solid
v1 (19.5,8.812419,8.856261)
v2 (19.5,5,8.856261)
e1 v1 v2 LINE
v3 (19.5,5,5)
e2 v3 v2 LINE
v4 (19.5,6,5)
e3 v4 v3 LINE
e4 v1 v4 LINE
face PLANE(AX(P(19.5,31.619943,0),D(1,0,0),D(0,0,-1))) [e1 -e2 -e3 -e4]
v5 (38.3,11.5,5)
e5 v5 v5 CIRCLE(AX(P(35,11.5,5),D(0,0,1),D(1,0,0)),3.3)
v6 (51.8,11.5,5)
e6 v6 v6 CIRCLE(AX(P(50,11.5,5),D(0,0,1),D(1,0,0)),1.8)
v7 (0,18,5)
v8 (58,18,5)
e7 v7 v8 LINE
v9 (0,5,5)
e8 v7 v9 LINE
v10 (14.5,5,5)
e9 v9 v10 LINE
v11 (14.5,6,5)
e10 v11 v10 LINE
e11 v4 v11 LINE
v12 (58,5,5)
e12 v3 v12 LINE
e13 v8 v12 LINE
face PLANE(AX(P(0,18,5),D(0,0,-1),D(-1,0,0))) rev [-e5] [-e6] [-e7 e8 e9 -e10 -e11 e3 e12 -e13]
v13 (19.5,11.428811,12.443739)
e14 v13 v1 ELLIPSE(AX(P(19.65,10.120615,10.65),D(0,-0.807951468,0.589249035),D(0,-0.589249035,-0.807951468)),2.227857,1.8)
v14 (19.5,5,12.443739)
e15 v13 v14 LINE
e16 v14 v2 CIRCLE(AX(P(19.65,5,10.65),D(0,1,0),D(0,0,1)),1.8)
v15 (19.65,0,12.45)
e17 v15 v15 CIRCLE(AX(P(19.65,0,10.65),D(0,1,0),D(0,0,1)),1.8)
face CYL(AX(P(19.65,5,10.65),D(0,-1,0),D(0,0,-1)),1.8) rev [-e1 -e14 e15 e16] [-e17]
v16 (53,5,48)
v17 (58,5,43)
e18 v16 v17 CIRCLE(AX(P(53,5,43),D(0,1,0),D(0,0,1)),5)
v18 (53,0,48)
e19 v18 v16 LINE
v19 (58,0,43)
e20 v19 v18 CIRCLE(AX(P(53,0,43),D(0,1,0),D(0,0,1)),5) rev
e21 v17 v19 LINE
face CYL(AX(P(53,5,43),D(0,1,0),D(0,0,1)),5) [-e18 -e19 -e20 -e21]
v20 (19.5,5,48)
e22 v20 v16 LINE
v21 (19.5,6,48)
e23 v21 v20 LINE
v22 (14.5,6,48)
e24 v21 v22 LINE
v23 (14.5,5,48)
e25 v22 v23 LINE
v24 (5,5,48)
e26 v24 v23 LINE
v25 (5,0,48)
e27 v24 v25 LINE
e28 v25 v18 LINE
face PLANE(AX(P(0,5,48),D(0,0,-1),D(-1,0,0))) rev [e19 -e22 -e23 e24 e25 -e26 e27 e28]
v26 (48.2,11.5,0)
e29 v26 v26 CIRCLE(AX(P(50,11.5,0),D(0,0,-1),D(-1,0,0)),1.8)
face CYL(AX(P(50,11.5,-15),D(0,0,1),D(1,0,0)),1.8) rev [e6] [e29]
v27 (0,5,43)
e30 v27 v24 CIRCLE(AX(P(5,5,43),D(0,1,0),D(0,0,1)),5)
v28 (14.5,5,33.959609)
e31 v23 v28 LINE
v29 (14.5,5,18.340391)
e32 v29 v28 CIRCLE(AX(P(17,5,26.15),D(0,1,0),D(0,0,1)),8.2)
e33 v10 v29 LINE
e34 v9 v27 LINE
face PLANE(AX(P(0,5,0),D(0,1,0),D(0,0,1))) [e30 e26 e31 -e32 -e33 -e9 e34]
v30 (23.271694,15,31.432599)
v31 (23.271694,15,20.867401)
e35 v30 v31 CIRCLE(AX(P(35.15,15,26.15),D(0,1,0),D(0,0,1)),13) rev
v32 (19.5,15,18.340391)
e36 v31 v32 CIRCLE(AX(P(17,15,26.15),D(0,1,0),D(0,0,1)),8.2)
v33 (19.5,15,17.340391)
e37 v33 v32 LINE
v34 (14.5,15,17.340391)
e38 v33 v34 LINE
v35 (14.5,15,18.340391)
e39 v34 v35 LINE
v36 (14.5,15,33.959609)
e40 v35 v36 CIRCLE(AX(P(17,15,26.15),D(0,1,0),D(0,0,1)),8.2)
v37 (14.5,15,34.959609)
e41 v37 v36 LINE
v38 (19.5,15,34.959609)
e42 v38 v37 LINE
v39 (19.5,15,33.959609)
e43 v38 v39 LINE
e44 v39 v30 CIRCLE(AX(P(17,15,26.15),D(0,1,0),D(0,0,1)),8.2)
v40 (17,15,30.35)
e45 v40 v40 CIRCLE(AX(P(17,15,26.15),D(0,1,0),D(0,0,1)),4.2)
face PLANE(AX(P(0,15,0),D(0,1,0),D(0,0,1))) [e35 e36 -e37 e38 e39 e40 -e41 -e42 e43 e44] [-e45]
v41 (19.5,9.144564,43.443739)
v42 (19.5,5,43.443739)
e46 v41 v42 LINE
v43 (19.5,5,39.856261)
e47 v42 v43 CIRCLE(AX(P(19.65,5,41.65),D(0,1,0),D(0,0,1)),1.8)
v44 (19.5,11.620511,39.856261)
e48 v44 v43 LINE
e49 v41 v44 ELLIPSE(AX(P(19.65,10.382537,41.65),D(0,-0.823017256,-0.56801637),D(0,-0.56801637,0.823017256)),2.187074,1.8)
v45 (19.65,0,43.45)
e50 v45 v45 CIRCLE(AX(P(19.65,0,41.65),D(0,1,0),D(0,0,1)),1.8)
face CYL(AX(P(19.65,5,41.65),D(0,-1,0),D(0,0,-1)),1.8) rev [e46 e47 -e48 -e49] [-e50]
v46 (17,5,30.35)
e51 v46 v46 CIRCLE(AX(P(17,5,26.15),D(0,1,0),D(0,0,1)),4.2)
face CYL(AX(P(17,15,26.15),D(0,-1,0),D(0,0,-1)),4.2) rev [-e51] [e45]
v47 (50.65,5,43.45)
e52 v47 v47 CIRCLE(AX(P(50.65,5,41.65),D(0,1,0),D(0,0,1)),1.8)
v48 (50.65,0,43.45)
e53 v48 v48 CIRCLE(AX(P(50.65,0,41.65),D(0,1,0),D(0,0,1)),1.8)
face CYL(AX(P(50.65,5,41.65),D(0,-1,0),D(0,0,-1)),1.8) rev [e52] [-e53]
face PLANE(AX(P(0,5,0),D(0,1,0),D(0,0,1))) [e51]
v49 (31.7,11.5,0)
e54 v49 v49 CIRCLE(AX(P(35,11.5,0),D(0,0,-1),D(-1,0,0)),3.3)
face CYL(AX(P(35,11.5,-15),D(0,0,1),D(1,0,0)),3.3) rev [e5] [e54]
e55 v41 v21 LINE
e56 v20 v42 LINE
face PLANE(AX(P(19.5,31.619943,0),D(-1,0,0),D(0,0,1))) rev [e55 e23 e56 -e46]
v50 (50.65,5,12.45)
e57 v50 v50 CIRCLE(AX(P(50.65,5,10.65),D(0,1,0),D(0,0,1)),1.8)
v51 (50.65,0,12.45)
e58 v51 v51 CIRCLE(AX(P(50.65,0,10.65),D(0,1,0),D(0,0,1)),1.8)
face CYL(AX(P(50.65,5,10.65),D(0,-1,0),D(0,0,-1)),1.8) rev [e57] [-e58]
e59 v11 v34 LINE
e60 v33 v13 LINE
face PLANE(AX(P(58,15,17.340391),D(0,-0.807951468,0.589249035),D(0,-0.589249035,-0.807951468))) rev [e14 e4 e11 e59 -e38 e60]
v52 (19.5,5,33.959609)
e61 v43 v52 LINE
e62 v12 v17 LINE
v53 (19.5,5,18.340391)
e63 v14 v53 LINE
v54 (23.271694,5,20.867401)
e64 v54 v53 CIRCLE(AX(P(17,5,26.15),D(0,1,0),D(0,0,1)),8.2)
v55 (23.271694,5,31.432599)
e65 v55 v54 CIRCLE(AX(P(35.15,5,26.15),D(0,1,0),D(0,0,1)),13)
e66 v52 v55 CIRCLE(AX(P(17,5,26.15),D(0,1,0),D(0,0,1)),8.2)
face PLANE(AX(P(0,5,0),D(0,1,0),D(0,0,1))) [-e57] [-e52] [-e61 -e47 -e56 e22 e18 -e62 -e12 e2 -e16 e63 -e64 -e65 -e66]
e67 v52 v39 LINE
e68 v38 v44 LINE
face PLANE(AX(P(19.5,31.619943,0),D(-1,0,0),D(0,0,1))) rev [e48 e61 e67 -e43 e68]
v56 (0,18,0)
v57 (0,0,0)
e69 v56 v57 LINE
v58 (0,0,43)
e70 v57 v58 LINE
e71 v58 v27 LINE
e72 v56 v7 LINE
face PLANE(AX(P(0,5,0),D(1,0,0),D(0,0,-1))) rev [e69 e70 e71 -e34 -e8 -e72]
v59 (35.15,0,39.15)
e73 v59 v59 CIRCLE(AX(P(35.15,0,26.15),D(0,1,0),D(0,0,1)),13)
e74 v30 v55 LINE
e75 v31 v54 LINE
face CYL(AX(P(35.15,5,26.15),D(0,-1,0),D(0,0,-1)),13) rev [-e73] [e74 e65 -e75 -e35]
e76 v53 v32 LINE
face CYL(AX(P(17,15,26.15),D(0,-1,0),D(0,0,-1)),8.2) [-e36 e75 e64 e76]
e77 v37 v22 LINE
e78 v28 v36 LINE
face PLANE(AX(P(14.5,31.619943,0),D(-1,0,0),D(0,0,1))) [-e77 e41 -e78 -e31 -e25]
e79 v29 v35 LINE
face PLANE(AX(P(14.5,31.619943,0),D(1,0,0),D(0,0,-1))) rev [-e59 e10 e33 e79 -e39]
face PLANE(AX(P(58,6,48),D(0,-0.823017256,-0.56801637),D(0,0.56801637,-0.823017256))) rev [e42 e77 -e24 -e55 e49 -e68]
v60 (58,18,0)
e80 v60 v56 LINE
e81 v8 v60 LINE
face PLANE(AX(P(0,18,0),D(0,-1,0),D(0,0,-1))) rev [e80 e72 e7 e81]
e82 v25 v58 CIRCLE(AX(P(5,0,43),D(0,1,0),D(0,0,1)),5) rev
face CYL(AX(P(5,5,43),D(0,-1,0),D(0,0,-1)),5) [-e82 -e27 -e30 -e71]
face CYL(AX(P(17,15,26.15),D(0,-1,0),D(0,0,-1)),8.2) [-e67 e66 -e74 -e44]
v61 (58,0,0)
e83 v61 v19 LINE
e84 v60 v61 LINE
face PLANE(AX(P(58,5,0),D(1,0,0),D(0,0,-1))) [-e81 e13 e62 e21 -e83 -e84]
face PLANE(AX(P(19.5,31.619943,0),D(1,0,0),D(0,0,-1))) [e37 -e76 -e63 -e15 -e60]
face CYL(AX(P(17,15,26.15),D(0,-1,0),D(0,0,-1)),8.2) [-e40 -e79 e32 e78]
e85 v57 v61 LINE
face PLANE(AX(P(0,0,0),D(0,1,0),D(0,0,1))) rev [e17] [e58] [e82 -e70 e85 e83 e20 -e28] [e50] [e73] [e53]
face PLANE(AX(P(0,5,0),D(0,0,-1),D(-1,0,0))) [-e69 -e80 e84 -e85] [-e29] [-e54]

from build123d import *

# Parameters (mm, degrees)
SKETCH1_W               = 58
SKETCH1_H               = 48
SKETCH1_R               = 13
SKETCH1_R_2             = 1.8
BOSS_EXTRUDE1_DEPTH     = 5
BOSS_EXTRUDE2_OUTLINE_R = 4.2
BOSS_EXTRUDE2_DEPTH     = 10
FILLET1_R               = 5
BOSS_EXTRUDE5_DEPTH     = 10
CUT_EXTRUDE2_DEPTH      = 67.492480778
SKETCH7_W               = 58
SKETCH7_H               = 5
BOSS_EXTRUDE6_DEPTH     = 13
SKETCH8_R               = 3.3
SKETCH8_R_2             = 1.8
CUT_EXTRUDE3_DEPTH      = 20


# Read off the part's stored shape, not the designer's step: Boss-Extrude2, Boss-Extrude5
with BuildPart() as part:
    # Sketch1 → Boss-Extrude1 (new body)
    with BuildSketch(Plane(origin=(0, 0, 0), x_dir=(1, 0, 0), z_dir=(0, 1, 0))):
        with Locations((29, -24)):
            Rectangle(SKETCH1_W, SKETCH1_H)
        with Locations(Location((35.15, -26.15, 0), (0, 0, 270))):
            Circle(SKETCH1_R, mode=Mode.SUBTRACT)
        with Locations(Location((19.65, -10.65, 0), (0, 0, 270))):
            Circle(SKETCH1_R_2, mode=Mode.SUBTRACT)
        with Locations(Location((19.65, -41.65, 0), (0, 0, 270))):
            Circle(SKETCH1_R_2, mode=Mode.SUBTRACT)
        with Locations(Location((50.65, -41.65, 0), (0, 0, 270))):
            Circle(SKETCH1_R_2, mode=Mode.SUBTRACT)
        with Locations(Location((50.65, -10.65, 0), (0, 0, 270))):
            Circle(SKETCH1_R_2, mode=Mode.SUBTRACT)
    extrude(amount=BOSS_EXTRUDE1_DEPTH)

    # Boss-Extrude2 outline → Boss-Extrude2 (add)
    with BuildSketch(Plane(origin=(0, 5, 0), x_dir=(1, 0, 0), z_dir=(0, 1, 0))):
        with BuildLine():
            ThreePointArc((23.271694215, -31.432598951), (22.15, -26.15), (23.271694215, -20.867401049))
            ThreePointArc((23.271694215, -20.867401049), (8.8, -26.15), (23.271694215, -31.432598951))
        make_face()
        with Locations((17, -26.15)):
            Circle(BOSS_EXTRUDE2_OUTLINE_R, mode=Mode.SUBTRACT)
    extrude(amount=BOSS_EXTRUDE2_DEPTH)

    # Fillet1
    fillet1_edges = [part.edges().sort_by_distance(p)[0] for p in [
        (58, 2.5, 48),
        (0, 2.5, 48),
    ]]
    fillet(fillet1_edges, radius=FILLET1_R)

    # Boss-Extrude5 outline → Boss-Extrude5 (add)
    with BuildSketch(Plane(origin=(0, 5, 0), x_dir=(1, 0, 0), z_dir=(0, 1, 0))):
        with BuildLine():
            ThreePointArc((19.5, -12.443739111), (17.85, -10.65), (19.5, -8.856260889))
            Line((19.5, -8.856260889), (19.5, -5))
            Line((19.5, -5), (14.5, -5))
            Line((14.5, -5), (14.5, -18.340390535))
            ThreePointArc((14.5, -18.340390535), (17, -17.95), (19.5, -18.340390535))
            Line((19.5, -18.340390535), (19.5, -12.443739111))
        make_face()
        with BuildLine():
            ThreePointArc((19.5, -33.959609465), (17, -34.35), (14.5, -33.959609465))
            Line((14.5, -33.959609465), (14.5, -48))
            Line((14.5, -48), (19.5, -48))
            Line((19.5, -48), (19.5, -43.443739111))
            ThreePointArc((19.5, -43.443739111), (17.85, -41.65), (19.5, -39.856260889))
            Line((19.5, -39.856260889), (19.5, -33.959609465))
        make_face()
    extrude(amount=BOSS_EXTRUDE5_DEPTH)

    # Sketch6 → Cut-Extrude2 (cut, through all)
    with BuildSketch(Plane.ZY.offset(-14.5)):
        Polygon((17.340390535, 15), (5, 6), (5, 15), align=None)
        Polygon((48, 6), (34.959609465, 15), (48, 15), align=None)
    extrude(amount=-CUT_EXTRUDE2_DEPTH, mode=Mode.SUBTRACT)

    # Sketch7 → Boss-Extrude6 (add)
    with BuildSketch(Plane(origin=(0, 5, 0), x_dir=(1, 0, 0), z_dir=(0, 1, 0))):
        with Locations((29, -2.5)):
            Rectangle(SKETCH7_W, SKETCH7_H)
    extrude(amount=BOSS_EXTRUDE6_DEPTH)

    # Sketch8 → Cut-Extrude3 (cut)
    with BuildSketch(Plane.XY.offset(5)):
        with Locations((35, 11.5)):
            Circle(SKETCH8_R)
        with Locations((50, 11.5)):
            Circle(SKETCH8_R_2)
    extrude(amount=-CUT_EXTRUDE3_DEPTH, mode=Mode.SUBTRACT)


solid = part.part
